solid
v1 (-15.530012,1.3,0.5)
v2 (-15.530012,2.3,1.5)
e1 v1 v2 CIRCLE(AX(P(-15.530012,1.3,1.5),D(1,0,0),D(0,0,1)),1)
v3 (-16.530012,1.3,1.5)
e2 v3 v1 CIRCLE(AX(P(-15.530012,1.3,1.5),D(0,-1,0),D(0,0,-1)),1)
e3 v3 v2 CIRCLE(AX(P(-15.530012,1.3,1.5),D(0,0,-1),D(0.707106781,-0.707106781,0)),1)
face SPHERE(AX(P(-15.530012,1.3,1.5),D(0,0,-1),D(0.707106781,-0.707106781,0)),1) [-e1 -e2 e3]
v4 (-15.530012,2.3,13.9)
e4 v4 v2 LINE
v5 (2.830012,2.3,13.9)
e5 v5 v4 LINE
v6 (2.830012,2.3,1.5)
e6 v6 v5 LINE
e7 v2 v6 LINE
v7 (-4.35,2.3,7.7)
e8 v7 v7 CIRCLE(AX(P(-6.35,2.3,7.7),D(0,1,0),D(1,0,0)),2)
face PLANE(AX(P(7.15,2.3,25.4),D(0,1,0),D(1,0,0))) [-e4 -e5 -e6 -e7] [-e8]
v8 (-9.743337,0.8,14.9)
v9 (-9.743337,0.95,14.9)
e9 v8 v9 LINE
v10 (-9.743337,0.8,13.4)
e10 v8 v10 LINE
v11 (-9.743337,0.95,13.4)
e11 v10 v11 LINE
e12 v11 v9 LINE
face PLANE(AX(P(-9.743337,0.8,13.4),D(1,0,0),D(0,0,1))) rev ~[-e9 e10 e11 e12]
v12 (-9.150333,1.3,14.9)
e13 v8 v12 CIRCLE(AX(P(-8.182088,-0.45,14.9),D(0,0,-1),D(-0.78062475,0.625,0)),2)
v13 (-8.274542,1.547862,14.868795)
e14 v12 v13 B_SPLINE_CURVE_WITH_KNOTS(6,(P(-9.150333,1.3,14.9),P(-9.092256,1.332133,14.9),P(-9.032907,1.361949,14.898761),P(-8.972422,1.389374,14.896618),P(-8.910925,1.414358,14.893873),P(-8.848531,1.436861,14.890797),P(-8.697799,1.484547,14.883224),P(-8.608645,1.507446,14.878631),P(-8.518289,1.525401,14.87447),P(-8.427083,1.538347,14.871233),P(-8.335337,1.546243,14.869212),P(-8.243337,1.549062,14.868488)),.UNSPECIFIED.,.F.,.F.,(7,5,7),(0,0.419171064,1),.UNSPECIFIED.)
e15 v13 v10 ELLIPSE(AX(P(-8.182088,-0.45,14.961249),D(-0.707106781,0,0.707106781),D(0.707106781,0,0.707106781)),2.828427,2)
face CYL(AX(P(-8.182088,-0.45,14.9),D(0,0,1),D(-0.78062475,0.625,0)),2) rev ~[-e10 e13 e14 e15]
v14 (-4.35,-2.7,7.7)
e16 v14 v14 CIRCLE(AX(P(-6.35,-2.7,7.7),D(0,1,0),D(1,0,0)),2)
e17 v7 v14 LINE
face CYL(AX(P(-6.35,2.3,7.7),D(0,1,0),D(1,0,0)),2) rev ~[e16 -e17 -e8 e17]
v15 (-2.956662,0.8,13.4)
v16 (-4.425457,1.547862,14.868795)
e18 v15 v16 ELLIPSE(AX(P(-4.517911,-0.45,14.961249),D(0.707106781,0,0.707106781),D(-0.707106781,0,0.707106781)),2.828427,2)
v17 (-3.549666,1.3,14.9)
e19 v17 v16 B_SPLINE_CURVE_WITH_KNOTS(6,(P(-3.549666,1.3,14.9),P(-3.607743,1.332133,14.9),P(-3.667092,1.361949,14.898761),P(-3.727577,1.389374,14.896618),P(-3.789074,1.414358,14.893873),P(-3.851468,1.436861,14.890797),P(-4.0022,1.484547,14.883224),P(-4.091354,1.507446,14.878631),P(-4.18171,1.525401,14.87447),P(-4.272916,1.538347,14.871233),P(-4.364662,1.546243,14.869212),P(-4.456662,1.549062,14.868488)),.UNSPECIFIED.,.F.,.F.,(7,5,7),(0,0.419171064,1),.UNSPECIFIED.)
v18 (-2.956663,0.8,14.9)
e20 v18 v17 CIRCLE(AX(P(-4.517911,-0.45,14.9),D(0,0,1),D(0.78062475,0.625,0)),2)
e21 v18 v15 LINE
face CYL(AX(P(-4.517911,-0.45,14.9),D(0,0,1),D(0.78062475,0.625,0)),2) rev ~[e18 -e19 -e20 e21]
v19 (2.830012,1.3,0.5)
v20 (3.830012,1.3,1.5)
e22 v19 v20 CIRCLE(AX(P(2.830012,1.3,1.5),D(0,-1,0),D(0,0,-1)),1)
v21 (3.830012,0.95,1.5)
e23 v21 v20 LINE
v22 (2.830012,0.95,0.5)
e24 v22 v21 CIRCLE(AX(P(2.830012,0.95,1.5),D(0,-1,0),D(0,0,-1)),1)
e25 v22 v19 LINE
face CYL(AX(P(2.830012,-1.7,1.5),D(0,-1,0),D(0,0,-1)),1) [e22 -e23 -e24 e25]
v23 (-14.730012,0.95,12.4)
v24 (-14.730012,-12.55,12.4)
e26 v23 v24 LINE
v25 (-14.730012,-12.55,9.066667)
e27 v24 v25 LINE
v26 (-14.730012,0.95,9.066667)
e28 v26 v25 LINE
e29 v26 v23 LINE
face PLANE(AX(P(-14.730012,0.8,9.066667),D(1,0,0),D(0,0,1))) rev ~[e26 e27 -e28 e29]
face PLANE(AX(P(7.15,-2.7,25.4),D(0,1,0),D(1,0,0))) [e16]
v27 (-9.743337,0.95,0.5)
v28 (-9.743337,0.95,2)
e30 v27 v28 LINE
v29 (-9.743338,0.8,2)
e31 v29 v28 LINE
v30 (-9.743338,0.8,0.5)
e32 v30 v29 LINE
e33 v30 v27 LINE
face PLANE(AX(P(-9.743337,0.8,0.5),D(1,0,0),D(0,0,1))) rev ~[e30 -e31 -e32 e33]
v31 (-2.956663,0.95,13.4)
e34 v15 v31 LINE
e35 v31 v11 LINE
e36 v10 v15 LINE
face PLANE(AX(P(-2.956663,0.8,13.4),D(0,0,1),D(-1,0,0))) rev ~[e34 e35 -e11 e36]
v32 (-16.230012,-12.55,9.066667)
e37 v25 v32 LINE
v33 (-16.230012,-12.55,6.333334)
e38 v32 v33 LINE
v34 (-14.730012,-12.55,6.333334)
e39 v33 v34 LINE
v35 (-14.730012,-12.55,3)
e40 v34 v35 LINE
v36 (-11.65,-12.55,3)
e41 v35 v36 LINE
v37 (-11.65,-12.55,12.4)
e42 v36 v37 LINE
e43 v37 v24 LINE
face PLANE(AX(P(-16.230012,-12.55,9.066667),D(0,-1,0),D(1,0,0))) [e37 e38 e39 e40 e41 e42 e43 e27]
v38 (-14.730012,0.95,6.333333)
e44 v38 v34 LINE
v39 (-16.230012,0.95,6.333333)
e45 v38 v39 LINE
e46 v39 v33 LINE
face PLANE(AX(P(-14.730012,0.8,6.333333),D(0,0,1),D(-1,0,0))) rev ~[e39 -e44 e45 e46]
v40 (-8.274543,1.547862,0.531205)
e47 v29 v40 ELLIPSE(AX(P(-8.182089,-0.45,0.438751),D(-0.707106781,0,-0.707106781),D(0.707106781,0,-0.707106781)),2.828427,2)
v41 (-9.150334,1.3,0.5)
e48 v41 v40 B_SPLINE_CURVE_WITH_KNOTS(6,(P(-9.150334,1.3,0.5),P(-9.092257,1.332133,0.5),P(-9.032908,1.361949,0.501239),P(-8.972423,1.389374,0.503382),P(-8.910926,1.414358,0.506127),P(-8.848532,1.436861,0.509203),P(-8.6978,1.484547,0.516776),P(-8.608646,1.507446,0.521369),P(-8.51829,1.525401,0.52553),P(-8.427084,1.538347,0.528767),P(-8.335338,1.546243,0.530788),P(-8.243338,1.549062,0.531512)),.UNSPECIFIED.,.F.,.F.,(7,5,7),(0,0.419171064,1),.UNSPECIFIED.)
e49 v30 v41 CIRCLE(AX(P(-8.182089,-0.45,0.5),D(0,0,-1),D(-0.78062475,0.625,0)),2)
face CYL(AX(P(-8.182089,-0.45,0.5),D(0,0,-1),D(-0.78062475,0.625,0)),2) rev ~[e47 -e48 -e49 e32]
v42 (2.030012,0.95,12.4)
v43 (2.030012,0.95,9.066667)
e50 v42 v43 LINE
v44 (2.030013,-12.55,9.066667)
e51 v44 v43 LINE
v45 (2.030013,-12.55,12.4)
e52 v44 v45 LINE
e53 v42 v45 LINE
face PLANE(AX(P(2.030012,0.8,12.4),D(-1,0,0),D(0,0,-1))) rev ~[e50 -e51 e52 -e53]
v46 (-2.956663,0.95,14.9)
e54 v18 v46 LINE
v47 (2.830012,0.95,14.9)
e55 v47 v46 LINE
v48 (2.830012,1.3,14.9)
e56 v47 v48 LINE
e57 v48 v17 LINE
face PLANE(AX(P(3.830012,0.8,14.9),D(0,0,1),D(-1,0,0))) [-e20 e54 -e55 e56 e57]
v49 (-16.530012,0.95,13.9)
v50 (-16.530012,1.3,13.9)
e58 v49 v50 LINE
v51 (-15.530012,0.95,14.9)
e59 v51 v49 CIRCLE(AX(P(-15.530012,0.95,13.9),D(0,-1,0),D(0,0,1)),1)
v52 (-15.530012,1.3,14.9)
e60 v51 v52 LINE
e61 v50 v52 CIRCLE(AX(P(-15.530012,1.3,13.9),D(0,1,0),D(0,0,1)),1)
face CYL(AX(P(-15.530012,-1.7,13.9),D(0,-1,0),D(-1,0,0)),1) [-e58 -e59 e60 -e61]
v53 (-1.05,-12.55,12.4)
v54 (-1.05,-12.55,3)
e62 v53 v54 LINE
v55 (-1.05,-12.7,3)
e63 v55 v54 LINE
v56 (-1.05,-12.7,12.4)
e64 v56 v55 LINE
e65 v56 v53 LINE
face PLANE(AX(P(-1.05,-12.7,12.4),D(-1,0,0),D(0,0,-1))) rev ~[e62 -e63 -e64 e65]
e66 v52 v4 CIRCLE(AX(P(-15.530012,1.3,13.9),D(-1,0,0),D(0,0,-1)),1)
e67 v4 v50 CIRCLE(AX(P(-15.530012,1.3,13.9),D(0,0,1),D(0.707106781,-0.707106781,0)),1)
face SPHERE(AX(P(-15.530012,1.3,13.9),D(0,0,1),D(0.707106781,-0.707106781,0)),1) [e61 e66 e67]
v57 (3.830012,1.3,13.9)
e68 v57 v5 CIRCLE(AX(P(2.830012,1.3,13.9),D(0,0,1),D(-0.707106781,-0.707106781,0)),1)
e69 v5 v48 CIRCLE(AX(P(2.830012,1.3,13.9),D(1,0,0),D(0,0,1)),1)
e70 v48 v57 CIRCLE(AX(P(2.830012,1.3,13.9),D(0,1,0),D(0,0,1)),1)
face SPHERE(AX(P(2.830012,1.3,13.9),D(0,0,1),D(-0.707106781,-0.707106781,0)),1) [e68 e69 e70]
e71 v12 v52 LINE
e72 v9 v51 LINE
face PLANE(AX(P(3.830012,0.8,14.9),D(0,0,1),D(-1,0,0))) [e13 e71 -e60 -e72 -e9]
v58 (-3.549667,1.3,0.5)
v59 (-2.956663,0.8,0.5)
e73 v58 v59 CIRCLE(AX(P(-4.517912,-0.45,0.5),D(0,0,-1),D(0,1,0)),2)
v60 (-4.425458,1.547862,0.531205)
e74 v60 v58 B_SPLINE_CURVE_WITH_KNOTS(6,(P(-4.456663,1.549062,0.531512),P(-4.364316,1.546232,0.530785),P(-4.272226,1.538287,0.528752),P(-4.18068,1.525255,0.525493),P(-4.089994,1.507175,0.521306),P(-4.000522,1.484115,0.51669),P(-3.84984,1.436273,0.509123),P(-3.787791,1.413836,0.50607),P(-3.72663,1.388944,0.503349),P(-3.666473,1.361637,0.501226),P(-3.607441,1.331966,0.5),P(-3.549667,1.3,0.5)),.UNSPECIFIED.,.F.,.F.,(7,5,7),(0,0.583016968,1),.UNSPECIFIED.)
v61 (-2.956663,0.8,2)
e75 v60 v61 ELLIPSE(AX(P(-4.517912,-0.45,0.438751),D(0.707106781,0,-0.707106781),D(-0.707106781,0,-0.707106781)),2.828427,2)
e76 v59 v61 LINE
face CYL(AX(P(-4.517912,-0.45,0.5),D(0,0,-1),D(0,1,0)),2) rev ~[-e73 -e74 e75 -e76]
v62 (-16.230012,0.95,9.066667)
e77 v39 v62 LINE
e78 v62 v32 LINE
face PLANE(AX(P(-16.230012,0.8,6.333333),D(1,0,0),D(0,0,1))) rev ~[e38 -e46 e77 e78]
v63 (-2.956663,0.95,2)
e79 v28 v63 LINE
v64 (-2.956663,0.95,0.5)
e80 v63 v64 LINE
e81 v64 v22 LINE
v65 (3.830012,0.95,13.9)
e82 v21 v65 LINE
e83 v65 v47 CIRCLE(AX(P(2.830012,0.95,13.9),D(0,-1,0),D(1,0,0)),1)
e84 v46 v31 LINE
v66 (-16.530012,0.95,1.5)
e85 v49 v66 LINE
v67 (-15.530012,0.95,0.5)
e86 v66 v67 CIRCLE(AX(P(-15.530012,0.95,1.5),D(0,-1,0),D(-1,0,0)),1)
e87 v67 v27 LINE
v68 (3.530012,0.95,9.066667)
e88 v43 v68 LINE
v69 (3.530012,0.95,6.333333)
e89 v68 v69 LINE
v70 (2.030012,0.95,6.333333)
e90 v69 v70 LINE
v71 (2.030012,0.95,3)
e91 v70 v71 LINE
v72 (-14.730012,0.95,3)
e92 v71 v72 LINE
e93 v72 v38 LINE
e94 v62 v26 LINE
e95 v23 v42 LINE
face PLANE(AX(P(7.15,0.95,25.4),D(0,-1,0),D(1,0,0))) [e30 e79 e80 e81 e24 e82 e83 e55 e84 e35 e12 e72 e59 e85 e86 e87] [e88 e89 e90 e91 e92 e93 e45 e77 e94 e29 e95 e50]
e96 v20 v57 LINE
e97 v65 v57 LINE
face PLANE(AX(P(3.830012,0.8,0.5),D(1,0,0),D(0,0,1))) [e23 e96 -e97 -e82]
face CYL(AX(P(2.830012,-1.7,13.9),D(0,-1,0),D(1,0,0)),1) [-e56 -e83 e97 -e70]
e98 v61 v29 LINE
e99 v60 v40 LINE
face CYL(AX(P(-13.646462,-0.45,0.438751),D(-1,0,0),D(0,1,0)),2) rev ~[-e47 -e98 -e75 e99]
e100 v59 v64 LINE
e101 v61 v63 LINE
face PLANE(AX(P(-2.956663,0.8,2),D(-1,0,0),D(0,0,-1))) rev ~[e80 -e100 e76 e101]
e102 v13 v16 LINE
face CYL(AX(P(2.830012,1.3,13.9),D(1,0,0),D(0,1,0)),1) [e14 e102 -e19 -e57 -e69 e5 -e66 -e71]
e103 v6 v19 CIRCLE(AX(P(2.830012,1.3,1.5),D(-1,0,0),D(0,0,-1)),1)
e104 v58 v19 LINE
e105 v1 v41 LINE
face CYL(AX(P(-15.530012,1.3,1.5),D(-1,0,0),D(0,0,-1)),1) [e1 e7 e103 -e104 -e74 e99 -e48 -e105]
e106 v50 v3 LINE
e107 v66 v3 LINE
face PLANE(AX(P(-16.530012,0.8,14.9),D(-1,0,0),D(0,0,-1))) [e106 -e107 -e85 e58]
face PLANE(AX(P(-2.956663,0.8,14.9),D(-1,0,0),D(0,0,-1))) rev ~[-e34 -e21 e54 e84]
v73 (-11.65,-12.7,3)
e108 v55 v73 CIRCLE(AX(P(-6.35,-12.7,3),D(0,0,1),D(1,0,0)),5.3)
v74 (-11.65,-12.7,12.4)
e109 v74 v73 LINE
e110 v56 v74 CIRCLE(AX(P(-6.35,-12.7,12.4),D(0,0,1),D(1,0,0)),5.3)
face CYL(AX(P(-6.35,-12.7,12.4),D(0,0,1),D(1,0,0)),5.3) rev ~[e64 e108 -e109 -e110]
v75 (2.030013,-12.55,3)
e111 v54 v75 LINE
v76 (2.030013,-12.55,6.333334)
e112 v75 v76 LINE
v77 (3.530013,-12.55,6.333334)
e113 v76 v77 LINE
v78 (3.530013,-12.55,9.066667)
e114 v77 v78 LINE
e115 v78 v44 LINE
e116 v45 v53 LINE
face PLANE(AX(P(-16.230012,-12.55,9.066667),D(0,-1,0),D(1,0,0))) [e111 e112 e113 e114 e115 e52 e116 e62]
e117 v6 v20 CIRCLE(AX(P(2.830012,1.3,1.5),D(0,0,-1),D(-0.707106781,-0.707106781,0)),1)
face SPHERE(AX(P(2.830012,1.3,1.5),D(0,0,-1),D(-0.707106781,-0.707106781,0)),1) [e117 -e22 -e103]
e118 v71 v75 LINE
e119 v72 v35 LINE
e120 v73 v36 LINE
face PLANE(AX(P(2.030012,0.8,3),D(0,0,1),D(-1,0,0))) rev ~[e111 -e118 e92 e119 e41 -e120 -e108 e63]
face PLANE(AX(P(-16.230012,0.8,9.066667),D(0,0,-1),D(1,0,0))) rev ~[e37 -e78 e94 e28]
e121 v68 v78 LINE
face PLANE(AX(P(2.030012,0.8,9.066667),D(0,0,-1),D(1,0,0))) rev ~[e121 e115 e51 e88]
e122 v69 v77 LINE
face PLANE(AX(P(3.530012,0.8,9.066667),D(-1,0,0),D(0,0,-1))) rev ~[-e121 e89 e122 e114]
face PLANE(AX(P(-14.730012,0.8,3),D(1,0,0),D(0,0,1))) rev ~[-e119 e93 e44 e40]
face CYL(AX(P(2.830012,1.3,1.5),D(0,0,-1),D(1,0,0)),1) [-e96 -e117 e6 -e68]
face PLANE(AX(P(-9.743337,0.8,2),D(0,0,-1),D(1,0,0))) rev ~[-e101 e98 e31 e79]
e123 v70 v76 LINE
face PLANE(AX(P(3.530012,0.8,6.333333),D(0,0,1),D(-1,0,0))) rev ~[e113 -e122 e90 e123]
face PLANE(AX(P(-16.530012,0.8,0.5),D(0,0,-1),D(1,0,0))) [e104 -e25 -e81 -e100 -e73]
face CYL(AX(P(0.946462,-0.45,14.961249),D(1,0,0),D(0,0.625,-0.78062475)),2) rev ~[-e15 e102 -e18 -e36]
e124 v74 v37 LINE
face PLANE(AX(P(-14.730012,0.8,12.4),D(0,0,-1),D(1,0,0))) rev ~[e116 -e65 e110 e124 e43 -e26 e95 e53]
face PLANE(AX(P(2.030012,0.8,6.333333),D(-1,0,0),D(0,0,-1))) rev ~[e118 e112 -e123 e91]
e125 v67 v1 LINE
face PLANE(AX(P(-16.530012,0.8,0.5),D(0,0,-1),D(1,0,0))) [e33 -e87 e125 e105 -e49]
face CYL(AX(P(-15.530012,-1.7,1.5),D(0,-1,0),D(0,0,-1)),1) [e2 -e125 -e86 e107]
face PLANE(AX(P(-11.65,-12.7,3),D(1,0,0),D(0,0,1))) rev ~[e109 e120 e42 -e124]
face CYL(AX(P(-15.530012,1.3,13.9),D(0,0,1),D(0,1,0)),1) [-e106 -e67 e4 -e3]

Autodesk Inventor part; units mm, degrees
ref_plane "YZ Plane" through (0, 0, 0) normal (1, 0, 0) x (0, 1, 0)
ref_plane "XZ Plane" through (0, 0, 0) normal (0, 1, 0) x (-1, 0, 0)
ref_plane "Work Plane8" through (7.15, 0.8, 25.4) normal (0, 1, 0) x (1, 0, 0)
sketch "Sketch21" plane through (7.15, 0.8, 25.4) normal (0, 1, 0) x (1, 0, 0)
  line L0 (-3, 3) -> (-24, 3)
  line L1 (-3, 197) -> (-3, 3)
  line L2 (-24, 197) -> (-3, 197)
  line L3 (-24, 3) -> (-24, 197)
  line L4 (-4.819988, 19.366667) -> (-3.319988, 19.366667)
  line L5 (-3.319988, 19.366667) -> (-3.319988, 16.033333)
  line L6 (-3.319988, 16.033333) -> (-4.819988, 16.033333)
  line L7 (-4.819988, 16.033333) -> (-4.819988, 12.7)
  line L8 (-4.819988, 12.7) -> (-22.180012, 12.7)
  line L9 (-22.180012, 12.7) -> (-22.180012, 16.033333)
  line L10 (-22.180012, 16.033333) -> (-23.680012, 16.033333)
  line L11 (-23.680012, 16.033333) -> (-23.680012, 19.366667)
  line L12 (-23.680012, 19.366667) -> (-22.180012, 19.366667)
  line L13 (-22.180012, 19.366667) -> (-22.180012, 22.7)
  line L14 (-22.180012, 22.7) -> (-4.819988, 22.7)
  line L15 (-4.819988, 22.7) -> (-4.819988, 19.366667)
  line L16 (-21.880012, 22.4) -> (-21.880012, 19.066667)
  line L17 (-21.880012, 19.066667) -> (-23.380012, 19.066667)
  line L18 (-23.380012, 19.066667) -> (-23.380012, 16.333333)
  line L19 (-23.380012, 16.333333) -> (-21.880012, 16.333333)
  line L20 (-21.880012, 16.333333) -> (-21.880012, 13)
  line L21 (-21.880012, 13) -> (-5.119988, 13)
  line L22 (-5.119988, 13) -> (-5.119988, 16.333333)
  line L23 (-5.119988, 16.333333) -> (-3.619988, 16.333333)
  line L24 (-3.619988, 16.333333) -> (-3.619988, 19.066667)
  line L25 (-3.619988, 19.066667) -> (-5.119988, 19.066667)
  line L26 (-5.119988, 19.066667) -> (-5.119988, 22.4)
  line L27 (-5.119988, 22.4) -> (-21.880012, 22.4)
  point P0 (-7.15, 25.4)
  dimension "d99" = 0.3
  dimension "d100" = 0.3
  dimension "d101" = 0.3
  dimension "d102" = 0.3
  dimension "d103" = 0.3
  dimension "d104" = 0.3
  dimension "d105" = 0.3
  dimension "d106" = 0.3
  dimension "d107" = 0.3
  dimension "d108" = 0.3
  dimension "d109" = 0.3
  dimension "d110" = 0.3
ref_plane "Work Plane9" through (-1.05, -12.7, 2.7) normal (0, 1, 0) x (0, 0, 1)
sketch "Sketch21 outline for Extrusion20" plane through (7.15, 0.8, 25.4) normal (0, 1, 0) x (1, 0, 0)
  line L0 (-5.119988, 22.4) -> (-21.880012, 22.4)
  line L1 (-5.119988, 19.066667) -> (-5.119988, 22.4)
  line L2 (-3.619988, 19.066667) -> (-5.119988, 19.066667)
  line L3 (-3.619988, 16.333333) -> (-3.619988, 19.066667)
  line L4 (-5.119988, 16.333333) -> (-3.619988, 16.333333)
  line L5 (-5.119988, 13) -> (-5.119988, 16.333333)
  line L6 (-21.880012, 13) -> (-5.119988, 13)
  line L7 (-21.880012, 16.333333) -> (-21.880012, 13)
  line L8 (-23.380012, 16.333333) -> (-21.880012, 16.333333)
  line L9 (-23.380012, 19.066667) -> (-23.380012, 16.333333)
  line L10 (-21.880012, 19.066667) -> (-23.380012, 19.066667)
  line L11 (-21.880012, 22.4) -> (-21.880012, 19.066667)
extrude "Extrusion20" add sketch "Sketch21 outline for Extrusion20" against normal up to surface (13.5 mm away)
sketch "Sketch22" plane through (-14.730012, 0.8, 12.4) normal (0, 0, 1) x (1, 0, 0)
  circle A0 centre (8.380012, -13.5) radius 5 construction
  arc A1 (3.080012, -13.5) -> (13.680012, -13.5) centre (8.380012, -13.5) ccw
  arc A2 (13.680012, -13.5) -> (3.080012, -13.5) centre (8.380012, -13.5) ccw
  point P0 (14.730012, -0.8)
sketch "Sketch22 outline for Extrusion21" plane through (-14.730012, 0.8, 12.4) normal (0, 0, 1) x (1, 0, 0)
  arc A0 (13.680012, -13.5) -> (3.080012, -13.5) centre (8.380012, -13.5) ccw
  arc A1 (3.080012, -13.5) -> (13.680012, -13.5) centre (8.380012, -13.5) ccw
extrude "Extrusion21" cut sketch "Sketch22 outline for Extrusion21" against normal through all
sketch "Sketch23" plane through (7.15, 0.8, 25.4) normal (0, 1, 0) x (1, 0, 0)
  line L0 (-21.880012, 22.4) -> (-21.880012, 19.066667)
  line L1 (-21.880012, 19.066667) -> (-23.380012, 19.066667)
  line L2 (-23.380012, 19.066667) -> (-23.380012, 16.333333)
  line L3 (-23.380012, 16.333333) -> (-21.880012, 16.333333)
  line L4 (-21.880012, 16.333333) -> (-21.880012, 13)
  line L5 (-21.880012, 13) -> (-5.119988, 13)
  line L6 (-5.119988, 13) -> (-5.119988, 16.333333)
  line L7 (-5.119988, 16.333333) -> (-3.619988, 16.333333)
  line L8 (-3.619988, 16.333333) -> (-3.619988, 19.066667)
  line L9 (-3.619988, 19.066667) -> (-5.119988, 19.066667)
  line L10 (-5.119988, 19.066667) -> (-5.119988, 22.4)
  line L11 (-5.119988, 22.4) -> (-21.880012, 22.4)
  line L12 (-24, 3) -> (-24, 197)
  line L13 (-3, 197) -> (-3, 3)
  line L14 (-23.680012, 24.9) -> (-3.319988, 24.9)
  line L15 (-3.319988, 24.9) -> (-3.319988, 10.5)
  line L16 (-3.319988, 10.5) -> (-23.680012, 10.5)
  line L17 (-23.680012, 10.5) -> (-23.680012, 24.9)
  point P0 (-7.15, 25.4)
  dimension "d115" = 2.5
  dimension "d116" = 2.5
  dimension "d117" = 0.3
  dimension "d118" = 0.3
sketch "Sketch23 outline for Extrusion22" plane through (7.15, 0.8, 25.4) normal (0, 1, 0) x (1, 0, 0)
  line L0 (-23.680012, 24.9) -> (-3.319988, 24.9)
  line L1 (-3.319988, 24.9) -> (-3.319988, 10.5)
  line L2 (-3.319988, 10.5) -> (-23.680012, 10.5)
  line L3 (-23.680012, 10.5) -> (-23.680012, 24.9)
extrude "Extrusion22" add sketch "Sketch23 outline for Extrusion22" along normal blind 1.5
sketch "Sketch24" plane through (-16.530012, 0.8, 14.9) normal (0, 0, 1) x (1, 0, 0)
  line L0 (20.360025, 1.5) -> (0, 1.5)
  line L1 (0, 0) -> (0, 1.5)
  line L2 (20.360025, 0) -> (0, 0)
  line L3 (20.360025, 0) -> (20.360025, 1.5)
  line L4 (6.786675, 0) -> (13.57335, 0)
  line L5 (13.57335, 0) -> (13.57335, 0.75)
  line L6 (13.57335, 0.75) -> (6.786675, 0.75)
  line L7 (6.786675, 0.75) -> (6.786675, 0)
  point P0 (16.530012, -0.8)
  dimension "d121" = 20.36002
  dimension "d122" = 6.78667
  dimension "d123" = 6.78667
  dimension "d124" = 0.75
  dimension "d125" = 1.5
sketch "Sketch24 outline for Extrusion23" plane through (-16.530012, 0.8, 14.9) normal (0, 0, 1) x (1, 0, 0)
  line L0 (6.786675, 0.75) -> (6.786675, 0)
  line L1 (13.57335, 0.75) -> (6.786675, 0.75)
  line L2 (13.57335, 0) -> (13.57335, 0.75)
  line L3 (6.786675, 0) -> (13.57335, 0)
extrude "Extrusion23" cut sketch "Sketch24 outline for Extrusion23" against normal blind 1.5
sketch "Sketch25" plane through (3.830012, 0.8, 0.5) normal (0, 0, -1) x (-1, 0, 0)
  line L0 (6.786675, 0.75) -> (6.786675, 0)
  line L1 (13.57335, 0.75) -> (6.786675, 0.75)
  line L2 (13.57335, 0) -> (13.57335, 0.75)
  line L3 (20.360025, 0) -> (0, 0)
  point P0 (3.830012, -0.8)
fillet "Fillet13" radius 2 3 edges at (-9.7433, 1.55, 14.15) (-2.9567, 1.55, 14.15) (-6.35, 1.55, 13.4)
sketch "Sketch25 outline for Extrusion24" plane through (3.830012, 0.8, 0.5) normal (0, 0, -1) x (-1, 0, 0)
  line L0 (13.57335, 0.75) -> (6.786675, 0.75)
  line L1 (13.57335, 0) -> (13.57335, 0.75)
  line L2 (6.786675, 0) -> (13.57335, 0)
  line L3 (6.786675, 0.75) -> (6.786675, 0)
extrude "Extrusion24" cut sketch "Sketch25 outline for Extrusion24" against normal blind 1.5
fillet "Fillet14" radius 2 3 edges at (-2.9567, 1.55, 1.25) (-9.7433, 1.55, 1.25) (-6.35, 1.55, 2)
fillet "Fillet15" radius 1 8 edges at (-6.35, 2.3, 0.5) (3.83, 2.3, 7.7) (-6.35, 2.3, 14.9) (-16.53, 2.3, 7.7) (3.83, 1.55, 0.5) (3.83, 1.55, 14.9) (-16.53, 1.55, 0.5) (-16.53, 1.55, 14.9)
sketch "Sketch26" plane through (-16.230012, -12.7, 9.066667) normal (0, -1, 0) x (1, 0, 0)
  line L0 (4.580012, -6.066667) -> (4.580012, 3.333333)
  line L1 (4.580012, 3.333333) -> (1.5, 3.333333)
  line L2 (1.5, 3.333333) -> (1.5, 0)
  line L3 (1.5, 0) -> (0, 0)
  line L4 (0, 0) -> (0, -2.733333)
  line L5 (0, -2.733333) -> (1.5, -2.733333)
  line L6 (1.5, -2.733333) -> (1.5, -6.066667)
  line L7 (1.5, -6.066667) -> (4.580012, -6.066667)
  line L8 (15.180012, 3.333333) -> (15.180012, -6.066667)
  line L9 (15.180012, -6.066667) -> (18.260025, -6.066667)
  line L10 (18.260025, -6.066667) -> (18.260025, -2.733333)
  line L11 (18.260025, -2.733333) -> (19.760025, -2.733333)
  line L12 (19.760025, -2.733333) -> (19.760025, 0)
  line L13 (19.760025, 0) -> (18.260025, 0)
  line L14 (18.260025, 0) -> (18.260025, 3.333333)
  line L15 (18.260025, 3.333333) -> (15.180012, 3.333333)
  point P0 (16.230012, -9.066667)
sketch "Sketch26 outline for Extrusion25" plane through (-16.230012, -12.7, 9.066667) normal (0, -1, 0) x (1, 0, 0)
  line L0 (1.5, -6.066667) -> (4.580012, -6.066667)
  line L1 (1.5, -2.733333) -> (1.5, -6.066667)
  line L2 (0, -2.733333) -> (1.5, -2.733333)
  line L3 (0, 0) -> (0, -2.733333)
  line L4 (1.5, 0) -> (0, 0)
  line L5 (1.5, 3.333333) -> (1.5, 0)
  line L6 (4.580012, 3.333333) -> (1.5, 3.333333)
  line L7 (4.580012, -6.066667) -> (4.580012, 3.333333)
  line L8 (18.260025, 3.333333) -> (15.180012, 3.333333)
  line L9 (18.260025, 0) -> (18.260025, 3.333333)
  line L10 (19.760025, 0) -> (18.260025, 0)
  line L11 (19.760025, -2.733333) -> (19.760025, 0)
  line L12 (18.260025, -2.733333) -> (19.760025, -2.733333)
  line L13 (18.260025, -6.066667) -> (18.260025, -2.733333)
  line L14 (15.180012, -6.066667) -> (18.260025, -6.066667)
  line L15 (15.180012, 3.333333) -> (15.180012, -6.066667)
extrude "Extrusion25" cut sketch "Sketch26 outline for Extrusion25" against normal blind 0.15
sketch "Sketch27" plane through (7.15, 0.8, 25.4) normal (0, -1, 0) x (1, 0, 0)
  line L0 (-3.619988, -16.333333) -> (-3.619988, -19.066667)
  line L1 (-3.619988, -19.066667) -> (-5.119988, -19.066667)
  line L2 (-5.119988, -19.066667) -> (-5.119988, -22.4)
  line L3 (-5.119988, -22.4) -> (-21.880012, -22.4)
  line L4 (-21.880012, -22.4) -> (-21.880012, -19.066667)
  line L5 (-21.880012, -19.066667) -> (-23.380012, -19.066667)
  line L6 (-23.380012, -19.066667) -> (-23.380012, -16.333333)
  line L7 (-23.380012, -16.333333) -> (-21.880012, -16.333333)
  line L8 (-21.880012, -16.333333) -> (-21.880012, -13)
  line L9 (-21.880012, -13) -> (-5.119988, -13)
  line L10 (-5.119988, -13) -> (-5.119988, -16.333333)
  line L11 (-5.119988, -16.333333) -> (-3.619988, -16.333333)
  arc A0 (-22.680012, -10.5) -> (-23.680012, -11.5) centre (-22.680012, -11.5) ccw
  line L12 (-23.680012, -11.5) -> (-23.680012, -23.9)
  arc A1 (-23.680012, -23.9) -> (-22.680012, -24.9) centre (-22.680012, -23.9) ccw
  line L13 (-22.680012, -24.9) -> (-16.893337, -24.9)
  line L14 (-16.893337, -24.9) -> (-16.893337, -23.4)
  line L15 (-16.893337, -23.4) -> (-10.106663, -23.4)
  line L16 (-10.106663, -23.4) -> (-10.106663, -24.9)
  line L17 (-10.106663, -24.9) -> (-4.319988, -24.9)
  arc A2 (-4.319988, -24.9) -> (-3.319988, -23.9) centre (-4.319988, -23.9) ccw
  line L18 (-3.319988, -23.9) -> (-3.319988, -11.5)
  arc A3 (-3.319988, -11.5) -> (-4.319988, -10.5) centre (-4.319988, -11.5) ccw
  line L19 (-4.319988, -10.5) -> (-10.106663, -10.5)
  line L20 (-10.106663, -10.5) -> (-10.106663, -12)
  line L21 (-10.106663, -12) -> (-16.893337, -12)
  line L22 (-16.893337, -12) -> (-16.893337, -10.5)
  line L23 (-16.893337, -10.5) -> (-22.680012, -10.5)
  point P0 (-7.15, -25.4)
sketch "Sketch27 outline for Extrusion26" plane through (7.15, 0.8, 25.4) normal (0, -1, 0) x (1, 0, 0)
  line L0 (-16.893337, -10.5) -> (-22.680012, -10.5)
  line L1 (-16.893337, -12) -> (-16.893337, -10.5)
  arc A0 (-22.680012, -10.5) -> (-23.680012, -11.5) centre (-22.680012, -11.5) ccw
  line L2 (-10.106663, -12) -> (-16.893337, -12)
  line L3 (-23.680012, -11.5) -> (-23.680012, -23.9)
  line L4 (-10.106663, -10.5) -> (-10.106663, -12)
  arc A1 (-23.680012, -23.9) -> (-22.680012, -24.9) centre (-22.680012, -23.9) ccw
  line L5 (-4.319988, -10.5) -> (-10.106663, -10.5)
  line L6 (-22.680012, -24.9) -> (-16.893337, -24.9)
  arc A2 (-3.319988, -11.5) -> (-4.319988, -10.5) centre (-4.319988, -11.5) ccw
  line L7 (-16.893337, -24.9) -> (-16.893337, -23.4)
  line L8 (-3.319988, -23.9) -> (-3.319988, -11.5)
  line L9 (-16.893337, -23.4) -> (-10.106663, -23.4)
  arc A3 (-4.319988, -24.9) -> (-3.319988, -23.9) centre (-4.319988, -23.9) ccw
  line L10 (-10.106663, -23.4) -> (-10.106663, -24.9)
  line L11 (-10.106663, -24.9) -> (-4.319988, -24.9)
  line L12 (-5.119988, -16.333333) -> (-3.619988, -16.333333)
  line L13 (-5.119988, -13) -> (-5.119988, -16.333333)
  line L14 (-21.880012, -13) -> (-5.119988, -13)
  line L15 (-21.880012, -16.333333) -> (-21.880012, -13)
  line L16 (-23.380012, -16.333333) -> (-21.880012, -16.333333)
  line L17 (-23.380012, -19.066667) -> (-23.380012, -16.333333)
  line L18 (-21.880012, -19.066667) -> (-23.380012, -19.066667)
  line L19 (-21.880012, -22.4) -> (-21.880012, -19.066667)
  line L20 (-5.119988, -22.4) -> (-21.880012, -22.4)
  line L21 (-5.119988, -19.066667) -> (-5.119988, -22.4)
  line L22 (-3.619988, -19.066667) -> (-5.119988, -19.066667)
  line L23 (-3.619988, -16.333333) -> (-3.619988, -19.066667)
extrude "Extrusion26" cut sketch "Sketch27 outline for Extrusion26" against normal blind 0.15
sketch "Sketch28" plane through (7.15, 2.3, 25.4) normal (0, 1, 0) x (1, 0, 0)
  circle A0 centre (-13.5, 17.7) radius 2
  point P0 (-7.15, 25.4)
sketch "Sketch28 outline for Extrusion27" plane through (7.15, 2.3, 25.4) normal (0, 1, 0) x (1, 0, 0)
  circle A0 centre (-13.5, 17.7) radius 2
extrude "Extrusion27" cut sketch "Sketch28 outline for Extrusion27" against normal blind 5
equation "\"d100\" = d99"
equation "\"d101\" = d99"
equation "\"d102\" = d101"
equation "\"d103\" = d102"
equation "\"d104\" = d102"
equation "\"d105\" = d104"
equation "\"d106\" = d105"
equation "\"d107\" = d106"
equation "\"d108\" = d106"
equation "\"d109\" = d107"
equation "\"d110\" = d109"
equation "\"d116\" = d115"
equation "\"d118\" = d117"
equation "\"d122\" = 0.333333 * d121"
equation "\"d123\" = d122"
equation "\"d124\" = 0.5 * d125"
properties part number "InternalKey"
